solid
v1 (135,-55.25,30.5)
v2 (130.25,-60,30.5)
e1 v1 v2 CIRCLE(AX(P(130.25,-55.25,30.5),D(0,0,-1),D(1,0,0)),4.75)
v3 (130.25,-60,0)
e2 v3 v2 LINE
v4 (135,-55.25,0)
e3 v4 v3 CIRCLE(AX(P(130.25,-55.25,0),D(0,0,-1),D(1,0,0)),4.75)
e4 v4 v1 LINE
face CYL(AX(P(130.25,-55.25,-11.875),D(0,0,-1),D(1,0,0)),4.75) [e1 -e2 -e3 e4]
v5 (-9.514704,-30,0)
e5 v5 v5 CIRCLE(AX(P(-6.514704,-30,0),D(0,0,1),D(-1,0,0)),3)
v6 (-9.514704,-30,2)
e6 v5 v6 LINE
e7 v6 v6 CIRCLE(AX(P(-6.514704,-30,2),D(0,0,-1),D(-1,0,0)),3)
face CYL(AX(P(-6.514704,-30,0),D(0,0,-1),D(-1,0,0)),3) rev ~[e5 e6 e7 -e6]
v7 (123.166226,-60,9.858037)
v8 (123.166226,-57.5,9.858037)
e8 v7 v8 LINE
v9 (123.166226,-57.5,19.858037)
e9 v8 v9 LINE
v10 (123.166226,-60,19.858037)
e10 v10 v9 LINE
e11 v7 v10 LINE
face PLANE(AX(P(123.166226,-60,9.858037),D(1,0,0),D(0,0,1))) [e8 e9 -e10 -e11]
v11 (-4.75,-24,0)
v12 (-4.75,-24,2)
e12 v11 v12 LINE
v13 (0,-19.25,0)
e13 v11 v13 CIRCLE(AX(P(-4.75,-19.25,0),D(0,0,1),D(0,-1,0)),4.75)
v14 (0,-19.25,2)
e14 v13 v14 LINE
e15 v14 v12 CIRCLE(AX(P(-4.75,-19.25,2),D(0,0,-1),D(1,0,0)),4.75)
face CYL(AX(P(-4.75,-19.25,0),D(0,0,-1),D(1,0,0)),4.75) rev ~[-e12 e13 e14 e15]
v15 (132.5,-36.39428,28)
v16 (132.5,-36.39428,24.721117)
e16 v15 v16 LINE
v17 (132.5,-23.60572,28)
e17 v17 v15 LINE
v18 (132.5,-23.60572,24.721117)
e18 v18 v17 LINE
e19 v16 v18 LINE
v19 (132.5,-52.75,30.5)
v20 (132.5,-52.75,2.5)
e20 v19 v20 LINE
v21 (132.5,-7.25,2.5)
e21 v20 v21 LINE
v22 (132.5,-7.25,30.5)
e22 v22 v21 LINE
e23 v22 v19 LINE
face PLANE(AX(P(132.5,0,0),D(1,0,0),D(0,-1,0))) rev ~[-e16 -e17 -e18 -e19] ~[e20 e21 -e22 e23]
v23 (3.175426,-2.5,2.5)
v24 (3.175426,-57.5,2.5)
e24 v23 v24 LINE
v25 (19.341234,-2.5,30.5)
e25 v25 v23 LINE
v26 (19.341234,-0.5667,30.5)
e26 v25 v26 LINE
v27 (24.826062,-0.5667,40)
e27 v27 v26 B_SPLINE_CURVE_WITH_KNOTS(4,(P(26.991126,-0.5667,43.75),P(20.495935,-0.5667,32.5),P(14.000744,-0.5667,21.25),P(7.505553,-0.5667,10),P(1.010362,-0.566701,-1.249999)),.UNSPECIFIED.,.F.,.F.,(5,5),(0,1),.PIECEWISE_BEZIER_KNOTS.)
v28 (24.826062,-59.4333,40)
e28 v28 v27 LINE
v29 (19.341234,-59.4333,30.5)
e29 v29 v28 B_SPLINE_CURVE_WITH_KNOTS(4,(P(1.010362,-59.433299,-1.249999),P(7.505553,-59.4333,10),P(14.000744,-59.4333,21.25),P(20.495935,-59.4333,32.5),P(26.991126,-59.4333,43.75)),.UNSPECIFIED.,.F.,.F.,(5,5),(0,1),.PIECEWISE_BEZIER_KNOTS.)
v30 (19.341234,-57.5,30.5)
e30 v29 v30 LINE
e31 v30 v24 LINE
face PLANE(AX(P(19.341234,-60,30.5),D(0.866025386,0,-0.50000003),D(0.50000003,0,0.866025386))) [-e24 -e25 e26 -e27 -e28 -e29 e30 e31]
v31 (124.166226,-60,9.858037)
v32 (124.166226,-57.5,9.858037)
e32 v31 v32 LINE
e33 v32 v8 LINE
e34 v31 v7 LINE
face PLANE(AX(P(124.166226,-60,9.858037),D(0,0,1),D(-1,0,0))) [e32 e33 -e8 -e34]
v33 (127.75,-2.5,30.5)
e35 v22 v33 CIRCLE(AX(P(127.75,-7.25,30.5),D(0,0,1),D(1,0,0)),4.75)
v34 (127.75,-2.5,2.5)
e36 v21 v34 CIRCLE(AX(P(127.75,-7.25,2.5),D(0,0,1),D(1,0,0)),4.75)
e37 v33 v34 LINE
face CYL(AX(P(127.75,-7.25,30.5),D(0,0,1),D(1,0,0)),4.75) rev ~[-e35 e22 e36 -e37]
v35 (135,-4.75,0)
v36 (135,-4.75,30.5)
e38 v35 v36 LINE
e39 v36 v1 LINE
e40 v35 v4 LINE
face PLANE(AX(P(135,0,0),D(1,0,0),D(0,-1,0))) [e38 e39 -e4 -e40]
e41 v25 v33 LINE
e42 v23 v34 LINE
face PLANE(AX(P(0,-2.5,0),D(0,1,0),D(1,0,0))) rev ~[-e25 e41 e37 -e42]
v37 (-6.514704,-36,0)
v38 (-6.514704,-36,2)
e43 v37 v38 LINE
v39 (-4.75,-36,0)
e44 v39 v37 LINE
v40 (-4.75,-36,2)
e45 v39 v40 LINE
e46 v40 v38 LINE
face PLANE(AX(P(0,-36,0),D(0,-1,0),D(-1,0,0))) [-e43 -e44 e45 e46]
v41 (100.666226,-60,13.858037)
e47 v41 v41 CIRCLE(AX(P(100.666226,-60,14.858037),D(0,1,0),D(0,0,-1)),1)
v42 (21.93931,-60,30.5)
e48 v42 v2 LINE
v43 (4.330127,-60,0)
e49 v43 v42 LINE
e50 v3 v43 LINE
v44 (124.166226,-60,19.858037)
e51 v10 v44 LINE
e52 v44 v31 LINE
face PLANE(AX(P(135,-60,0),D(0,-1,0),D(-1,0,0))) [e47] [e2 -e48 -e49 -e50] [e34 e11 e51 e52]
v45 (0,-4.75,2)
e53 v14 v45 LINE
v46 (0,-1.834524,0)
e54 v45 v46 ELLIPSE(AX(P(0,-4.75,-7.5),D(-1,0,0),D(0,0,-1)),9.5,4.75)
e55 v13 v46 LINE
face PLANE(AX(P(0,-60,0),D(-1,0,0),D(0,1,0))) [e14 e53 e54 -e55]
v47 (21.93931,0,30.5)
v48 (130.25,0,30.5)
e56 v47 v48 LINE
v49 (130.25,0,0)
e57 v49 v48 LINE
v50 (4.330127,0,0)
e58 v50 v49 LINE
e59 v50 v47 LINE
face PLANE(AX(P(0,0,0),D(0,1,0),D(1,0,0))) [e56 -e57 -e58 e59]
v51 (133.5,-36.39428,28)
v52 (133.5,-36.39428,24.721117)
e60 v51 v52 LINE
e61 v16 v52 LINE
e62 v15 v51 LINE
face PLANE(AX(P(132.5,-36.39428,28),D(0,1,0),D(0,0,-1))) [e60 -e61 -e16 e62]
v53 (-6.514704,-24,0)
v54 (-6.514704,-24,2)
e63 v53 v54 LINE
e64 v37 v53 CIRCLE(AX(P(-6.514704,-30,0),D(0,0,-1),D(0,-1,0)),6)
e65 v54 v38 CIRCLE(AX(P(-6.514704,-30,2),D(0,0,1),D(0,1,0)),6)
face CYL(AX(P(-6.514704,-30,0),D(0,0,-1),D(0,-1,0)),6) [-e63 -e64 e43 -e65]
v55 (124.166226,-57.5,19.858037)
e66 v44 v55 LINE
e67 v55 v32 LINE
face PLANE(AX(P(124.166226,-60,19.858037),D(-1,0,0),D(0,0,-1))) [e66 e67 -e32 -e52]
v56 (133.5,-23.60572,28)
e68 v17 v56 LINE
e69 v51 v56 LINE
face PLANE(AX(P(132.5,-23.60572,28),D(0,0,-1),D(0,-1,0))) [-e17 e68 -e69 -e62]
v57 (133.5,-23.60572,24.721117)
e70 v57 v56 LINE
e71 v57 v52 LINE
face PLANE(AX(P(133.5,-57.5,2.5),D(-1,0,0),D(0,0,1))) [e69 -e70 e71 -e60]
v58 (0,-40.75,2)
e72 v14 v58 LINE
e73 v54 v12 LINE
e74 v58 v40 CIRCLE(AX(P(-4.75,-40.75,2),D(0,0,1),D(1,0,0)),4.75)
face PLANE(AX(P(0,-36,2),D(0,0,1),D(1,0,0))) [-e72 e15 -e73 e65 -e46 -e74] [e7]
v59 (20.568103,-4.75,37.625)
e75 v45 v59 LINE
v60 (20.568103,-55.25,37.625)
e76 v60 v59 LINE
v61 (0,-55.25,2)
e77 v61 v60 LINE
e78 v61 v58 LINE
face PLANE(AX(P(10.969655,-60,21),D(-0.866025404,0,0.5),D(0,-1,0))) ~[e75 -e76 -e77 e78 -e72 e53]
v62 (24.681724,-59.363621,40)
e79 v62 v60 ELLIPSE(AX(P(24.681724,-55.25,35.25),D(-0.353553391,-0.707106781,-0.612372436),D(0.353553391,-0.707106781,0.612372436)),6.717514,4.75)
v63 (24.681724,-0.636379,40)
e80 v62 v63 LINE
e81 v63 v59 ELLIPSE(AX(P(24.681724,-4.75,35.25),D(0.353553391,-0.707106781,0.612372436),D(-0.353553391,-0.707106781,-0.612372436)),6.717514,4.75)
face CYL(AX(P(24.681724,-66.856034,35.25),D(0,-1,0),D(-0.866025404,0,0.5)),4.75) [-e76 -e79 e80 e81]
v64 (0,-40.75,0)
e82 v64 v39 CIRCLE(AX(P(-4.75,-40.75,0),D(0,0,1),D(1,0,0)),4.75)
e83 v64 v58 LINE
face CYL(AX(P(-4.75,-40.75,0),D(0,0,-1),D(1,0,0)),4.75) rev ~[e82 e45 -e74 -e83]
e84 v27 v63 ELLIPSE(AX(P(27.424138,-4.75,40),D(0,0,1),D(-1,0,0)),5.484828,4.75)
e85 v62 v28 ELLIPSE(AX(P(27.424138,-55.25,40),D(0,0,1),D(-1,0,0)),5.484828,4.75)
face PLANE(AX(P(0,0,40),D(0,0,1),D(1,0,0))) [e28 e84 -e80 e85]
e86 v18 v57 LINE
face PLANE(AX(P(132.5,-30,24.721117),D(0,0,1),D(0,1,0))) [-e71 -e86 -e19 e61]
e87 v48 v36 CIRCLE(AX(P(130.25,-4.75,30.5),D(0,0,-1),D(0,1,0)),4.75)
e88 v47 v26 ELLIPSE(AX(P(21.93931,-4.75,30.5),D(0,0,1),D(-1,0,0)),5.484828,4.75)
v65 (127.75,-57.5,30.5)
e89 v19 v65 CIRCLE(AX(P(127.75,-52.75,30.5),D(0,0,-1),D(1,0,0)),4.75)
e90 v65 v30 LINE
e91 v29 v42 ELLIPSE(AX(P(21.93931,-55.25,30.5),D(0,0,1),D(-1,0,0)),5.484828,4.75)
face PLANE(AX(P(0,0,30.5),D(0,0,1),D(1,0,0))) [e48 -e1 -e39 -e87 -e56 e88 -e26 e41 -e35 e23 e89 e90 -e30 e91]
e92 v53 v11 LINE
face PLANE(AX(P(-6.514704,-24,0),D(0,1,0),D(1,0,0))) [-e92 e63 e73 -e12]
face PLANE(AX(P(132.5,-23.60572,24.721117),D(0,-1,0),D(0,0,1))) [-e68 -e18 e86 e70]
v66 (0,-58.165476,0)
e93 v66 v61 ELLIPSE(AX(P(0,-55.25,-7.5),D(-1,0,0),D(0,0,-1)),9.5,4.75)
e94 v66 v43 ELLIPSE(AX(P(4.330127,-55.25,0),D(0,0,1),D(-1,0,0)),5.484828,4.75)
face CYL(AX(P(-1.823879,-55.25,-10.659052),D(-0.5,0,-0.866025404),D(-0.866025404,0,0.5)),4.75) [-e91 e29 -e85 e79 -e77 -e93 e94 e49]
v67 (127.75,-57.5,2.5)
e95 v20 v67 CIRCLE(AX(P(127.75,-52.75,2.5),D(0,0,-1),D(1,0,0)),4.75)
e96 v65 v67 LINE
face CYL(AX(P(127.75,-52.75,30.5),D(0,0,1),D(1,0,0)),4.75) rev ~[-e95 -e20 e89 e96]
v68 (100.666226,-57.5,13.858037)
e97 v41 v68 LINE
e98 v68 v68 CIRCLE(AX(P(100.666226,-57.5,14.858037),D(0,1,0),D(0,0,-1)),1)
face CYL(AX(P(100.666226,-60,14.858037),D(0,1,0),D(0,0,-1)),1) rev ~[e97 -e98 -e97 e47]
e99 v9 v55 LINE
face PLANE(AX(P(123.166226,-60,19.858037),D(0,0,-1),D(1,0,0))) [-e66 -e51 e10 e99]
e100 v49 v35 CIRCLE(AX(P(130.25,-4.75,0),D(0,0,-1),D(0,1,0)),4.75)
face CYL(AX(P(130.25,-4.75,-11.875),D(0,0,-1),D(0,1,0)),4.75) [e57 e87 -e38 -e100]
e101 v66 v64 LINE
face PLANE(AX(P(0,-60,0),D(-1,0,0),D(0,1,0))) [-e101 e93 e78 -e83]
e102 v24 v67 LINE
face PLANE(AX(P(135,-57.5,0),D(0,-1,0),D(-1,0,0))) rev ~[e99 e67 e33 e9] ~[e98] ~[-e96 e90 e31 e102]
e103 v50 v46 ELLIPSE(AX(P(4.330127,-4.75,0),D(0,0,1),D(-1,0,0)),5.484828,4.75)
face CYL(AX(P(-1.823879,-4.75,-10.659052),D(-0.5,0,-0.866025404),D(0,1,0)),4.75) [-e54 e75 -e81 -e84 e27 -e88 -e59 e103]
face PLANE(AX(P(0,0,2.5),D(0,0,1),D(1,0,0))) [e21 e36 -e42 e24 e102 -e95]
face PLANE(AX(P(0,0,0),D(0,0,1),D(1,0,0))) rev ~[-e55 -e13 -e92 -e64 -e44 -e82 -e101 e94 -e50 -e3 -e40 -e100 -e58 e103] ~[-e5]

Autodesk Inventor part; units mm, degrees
ref_plane "YZ Plane" through (0, 0, 0) normal (1, 0, 0) x (0, 1, 0)
ref_plane "XZ Plane" through (0, 0, 0) normal (0, 1, 0) x (-1, 0, 0)
ref_plane "XY Plane" through (0, 0, 0) normal (0, 0, 1) x (1, 0, 0)
sketch "Skizze1" plane through (0, 0, 0) normal (0, 0, 1) x (1, 0, 0)
  line L0 (0, 0) -> (135, 0)
  line L1 (135, 0) -> (135, -60)
  line L2 (135, -60) -> (0, -60)
  line L3 (0, -60) -> (0, 0)
  dimension "d0" = 135
  dimension "d1" = 60
extrude "Extrusion1" add sketch "Skizze1" along normal blind 40
chamfer "Fase1" distance 38 angle 30 1 edges at (0, -30, 40) measured on face at (0, -20, 13.3333)
shell "Wandung1" thickness 2.5 removed faces 1 at (59.626207, -20, 40)
sketch "Skizze2" plane through (0, 0, 40) normal (0, 0, 1) x (1, 0, 0)
  line L0 (24.826062, -57.5) -> (24.826062, -2.5)
  line L1 (24.826062, -2.5) -> (24.826062, 0)
  line L2 (24.826062, 0) -> (24.826062, -57.5)
  line L3 (24.826062, -57.5) -> (24.826062, -60)
  line L4 (32.285534, -57.5) -> (32.285534, -2.5)
  line L5 (32.285534, -2.5) -> (132.5, -2.5)
  line L6 (132.5, -2.5) -> (132.5, -57.5)
  line L7 (132.5, -57.5) -> (32.285534, -57.5)
  line L8 (21.290528, -60) -> (21.290528, 0)
  line L9 (21.290528, -60) -> (24.826062, -60)
  line L10 (135.042932, -60) -> (135.042932, 0)
  line L11 (135.042932, 0) -> (24.826062, 0)
  line L12 (24.826062, -60) -> (135.042932, -60)
  line L13 (24.826062, 0) -> (21.290528, 0)
  point P0 (0, 0)
  point P1 (32.285534, -2.5)
extrude "Extrusion2" cut sketch "Skizze2" against normal blind 9.5 contours L0 L1 L11 L10 L12 L3
sketch "Skizze3" plane through (0, -60, 0) normal (0, -1, 0) x (1, 0, 0)
  point P0 (0, 0)
  point P1 (100.666226, 14.858037)
hole "Bohrung1" at (100.666226, -60, 14.858037) direction (0, 1, 0) diameter 2 depth 8 tip angle 118
sketch "Skizze4" plane through (132.5, -57.5, 2.5) normal (-1, 0, 0) x (0, 0, 1)
  line L0 (22.221117, 33.89428) -> (25.5, 33.89428)
  line L1 (25.5, 33.89428) -> (25.5, 21.10572)
  line L2 (25.5, 21.10572) -> (22.221117, 21.10572)
  line L3 (22.221117, 21.10572) -> (22.221117, 33.89428)
  line L4 (0, 0) -> (0, 55)
  line L5 (0, 27.5) -> (28, 27.5)
  line L6 (28, 0) -> (28, 55)
  line L7 (28, 57.5) -> (28, -2.5)
  point P0 (-2.5, 57.5)
  dimension "d22" = 2.5
extrude "Extrusion3" cut sketch "Skizze4" against normal blind 1
sketch "Skizze5" plane through (0, -60, 0) normal (0, -1, 0) x (1, 0, 0)
  line L0 (132.5, 30.5) -> (24.826062, 30.5)
  line L1 (32.285534, 30.5) -> (19.341234, 30.5)
  line L2 (19.341234, 30.5) -> (24.826062, 40)
  line L3 (3.175426, 2.5) -> (24.826062, 40)
  line L4 (24.826062, 40) -> (32.013518, 40)
  line L5 (32.013518, 40) -> (32.013518, 30.5)
  point P0 (0, 0)
  point P1 (2.5, 4.827159)
  point P2 (23.251035, 30.965501)
  point P3 (127.540528, 30.5)
  point P4 (24.826062, 40)
extrude "Extrusion4" cut sketch "Skizze5" against normal through all
sketch "Skizze6" plane through (0, -60, 0) normal (0, -1, 0) x (1, 0, 0)
  circle A0 centre (100.666226, 14.858037) radius 1
  line L0 (124.166226, 9.858037) -> (123.166226, 9.858037)
  line L1 (123.166226, 9.858037) -> (123.166226, 19.858037)
  line L2 (123.166226, 19.858037) -> (124.166226, 19.858037)
  line L3 (124.166226, 19.858037) -> (124.166226, 9.858037)
  line L4 (100.666226, 14.858037) -> (116.026843, 14.858037)
  point P0 (0, 0)
  dimension "d23" = 1
  dimension "d24" = 10
  dimension "d25" = 22.5
extrude "Extrusion5" cut sketch "Skizze6" against normal up to surface (2.5 mm away) contours L0 L1 L2 L3
sketch "Skizze7" plane through (0, 0, 0) normal (0, 0, -1) x (-1, 0, 0)
  line L0 (0, -36) -> (6.514704, -36)
  line L1 (12.514704, -30) -> (12.514704, -30)
  line L2 (6.514704, -24) -> (0, -24)
  line L3 (0, -24) -> (0, -36)
  line L4 (-21.93931, -60) -> (-21.93931, 0)
  line L5 (-21.93931, -30) -> (18.562445, -30)
  circle A0 centre (6.514704, -30) radius 3
  arc A1 (6.514704, -36) -> (12.514704, -30) centre (6.514704, -30) ccw
  arc A2 (12.514704, -30) -> (6.514704, -24) centre (6.514704, -30) ccw
  point P0 (0, 0)
  point P1 (12.514704, -30)
  dimension "d28" = 6
  dimension "d29" = 6
  dimension "d30" = 6
  dimension "d31" = 6
extrude "Extrusion6" add sketch "Skizze7" against normal blind 2 contours L3 L5 A0 A1 L0 | L3 L2 A2 L5 A0
fillet "Rundung1" radius 4.75 2 edges at (0, -24, 1) (0, -36, 1)
fillet "Rundung2" radius 4.75 7 edges at (21.9393, -30, 40) (10.9697, -60, 21) (10.9697, 0, 21) (135, 0, 15.25) (135, -60, 15.25) (132.5, -57.5, 16.5) (132.5, -2.5, 16.5)
properties part number "Case"
